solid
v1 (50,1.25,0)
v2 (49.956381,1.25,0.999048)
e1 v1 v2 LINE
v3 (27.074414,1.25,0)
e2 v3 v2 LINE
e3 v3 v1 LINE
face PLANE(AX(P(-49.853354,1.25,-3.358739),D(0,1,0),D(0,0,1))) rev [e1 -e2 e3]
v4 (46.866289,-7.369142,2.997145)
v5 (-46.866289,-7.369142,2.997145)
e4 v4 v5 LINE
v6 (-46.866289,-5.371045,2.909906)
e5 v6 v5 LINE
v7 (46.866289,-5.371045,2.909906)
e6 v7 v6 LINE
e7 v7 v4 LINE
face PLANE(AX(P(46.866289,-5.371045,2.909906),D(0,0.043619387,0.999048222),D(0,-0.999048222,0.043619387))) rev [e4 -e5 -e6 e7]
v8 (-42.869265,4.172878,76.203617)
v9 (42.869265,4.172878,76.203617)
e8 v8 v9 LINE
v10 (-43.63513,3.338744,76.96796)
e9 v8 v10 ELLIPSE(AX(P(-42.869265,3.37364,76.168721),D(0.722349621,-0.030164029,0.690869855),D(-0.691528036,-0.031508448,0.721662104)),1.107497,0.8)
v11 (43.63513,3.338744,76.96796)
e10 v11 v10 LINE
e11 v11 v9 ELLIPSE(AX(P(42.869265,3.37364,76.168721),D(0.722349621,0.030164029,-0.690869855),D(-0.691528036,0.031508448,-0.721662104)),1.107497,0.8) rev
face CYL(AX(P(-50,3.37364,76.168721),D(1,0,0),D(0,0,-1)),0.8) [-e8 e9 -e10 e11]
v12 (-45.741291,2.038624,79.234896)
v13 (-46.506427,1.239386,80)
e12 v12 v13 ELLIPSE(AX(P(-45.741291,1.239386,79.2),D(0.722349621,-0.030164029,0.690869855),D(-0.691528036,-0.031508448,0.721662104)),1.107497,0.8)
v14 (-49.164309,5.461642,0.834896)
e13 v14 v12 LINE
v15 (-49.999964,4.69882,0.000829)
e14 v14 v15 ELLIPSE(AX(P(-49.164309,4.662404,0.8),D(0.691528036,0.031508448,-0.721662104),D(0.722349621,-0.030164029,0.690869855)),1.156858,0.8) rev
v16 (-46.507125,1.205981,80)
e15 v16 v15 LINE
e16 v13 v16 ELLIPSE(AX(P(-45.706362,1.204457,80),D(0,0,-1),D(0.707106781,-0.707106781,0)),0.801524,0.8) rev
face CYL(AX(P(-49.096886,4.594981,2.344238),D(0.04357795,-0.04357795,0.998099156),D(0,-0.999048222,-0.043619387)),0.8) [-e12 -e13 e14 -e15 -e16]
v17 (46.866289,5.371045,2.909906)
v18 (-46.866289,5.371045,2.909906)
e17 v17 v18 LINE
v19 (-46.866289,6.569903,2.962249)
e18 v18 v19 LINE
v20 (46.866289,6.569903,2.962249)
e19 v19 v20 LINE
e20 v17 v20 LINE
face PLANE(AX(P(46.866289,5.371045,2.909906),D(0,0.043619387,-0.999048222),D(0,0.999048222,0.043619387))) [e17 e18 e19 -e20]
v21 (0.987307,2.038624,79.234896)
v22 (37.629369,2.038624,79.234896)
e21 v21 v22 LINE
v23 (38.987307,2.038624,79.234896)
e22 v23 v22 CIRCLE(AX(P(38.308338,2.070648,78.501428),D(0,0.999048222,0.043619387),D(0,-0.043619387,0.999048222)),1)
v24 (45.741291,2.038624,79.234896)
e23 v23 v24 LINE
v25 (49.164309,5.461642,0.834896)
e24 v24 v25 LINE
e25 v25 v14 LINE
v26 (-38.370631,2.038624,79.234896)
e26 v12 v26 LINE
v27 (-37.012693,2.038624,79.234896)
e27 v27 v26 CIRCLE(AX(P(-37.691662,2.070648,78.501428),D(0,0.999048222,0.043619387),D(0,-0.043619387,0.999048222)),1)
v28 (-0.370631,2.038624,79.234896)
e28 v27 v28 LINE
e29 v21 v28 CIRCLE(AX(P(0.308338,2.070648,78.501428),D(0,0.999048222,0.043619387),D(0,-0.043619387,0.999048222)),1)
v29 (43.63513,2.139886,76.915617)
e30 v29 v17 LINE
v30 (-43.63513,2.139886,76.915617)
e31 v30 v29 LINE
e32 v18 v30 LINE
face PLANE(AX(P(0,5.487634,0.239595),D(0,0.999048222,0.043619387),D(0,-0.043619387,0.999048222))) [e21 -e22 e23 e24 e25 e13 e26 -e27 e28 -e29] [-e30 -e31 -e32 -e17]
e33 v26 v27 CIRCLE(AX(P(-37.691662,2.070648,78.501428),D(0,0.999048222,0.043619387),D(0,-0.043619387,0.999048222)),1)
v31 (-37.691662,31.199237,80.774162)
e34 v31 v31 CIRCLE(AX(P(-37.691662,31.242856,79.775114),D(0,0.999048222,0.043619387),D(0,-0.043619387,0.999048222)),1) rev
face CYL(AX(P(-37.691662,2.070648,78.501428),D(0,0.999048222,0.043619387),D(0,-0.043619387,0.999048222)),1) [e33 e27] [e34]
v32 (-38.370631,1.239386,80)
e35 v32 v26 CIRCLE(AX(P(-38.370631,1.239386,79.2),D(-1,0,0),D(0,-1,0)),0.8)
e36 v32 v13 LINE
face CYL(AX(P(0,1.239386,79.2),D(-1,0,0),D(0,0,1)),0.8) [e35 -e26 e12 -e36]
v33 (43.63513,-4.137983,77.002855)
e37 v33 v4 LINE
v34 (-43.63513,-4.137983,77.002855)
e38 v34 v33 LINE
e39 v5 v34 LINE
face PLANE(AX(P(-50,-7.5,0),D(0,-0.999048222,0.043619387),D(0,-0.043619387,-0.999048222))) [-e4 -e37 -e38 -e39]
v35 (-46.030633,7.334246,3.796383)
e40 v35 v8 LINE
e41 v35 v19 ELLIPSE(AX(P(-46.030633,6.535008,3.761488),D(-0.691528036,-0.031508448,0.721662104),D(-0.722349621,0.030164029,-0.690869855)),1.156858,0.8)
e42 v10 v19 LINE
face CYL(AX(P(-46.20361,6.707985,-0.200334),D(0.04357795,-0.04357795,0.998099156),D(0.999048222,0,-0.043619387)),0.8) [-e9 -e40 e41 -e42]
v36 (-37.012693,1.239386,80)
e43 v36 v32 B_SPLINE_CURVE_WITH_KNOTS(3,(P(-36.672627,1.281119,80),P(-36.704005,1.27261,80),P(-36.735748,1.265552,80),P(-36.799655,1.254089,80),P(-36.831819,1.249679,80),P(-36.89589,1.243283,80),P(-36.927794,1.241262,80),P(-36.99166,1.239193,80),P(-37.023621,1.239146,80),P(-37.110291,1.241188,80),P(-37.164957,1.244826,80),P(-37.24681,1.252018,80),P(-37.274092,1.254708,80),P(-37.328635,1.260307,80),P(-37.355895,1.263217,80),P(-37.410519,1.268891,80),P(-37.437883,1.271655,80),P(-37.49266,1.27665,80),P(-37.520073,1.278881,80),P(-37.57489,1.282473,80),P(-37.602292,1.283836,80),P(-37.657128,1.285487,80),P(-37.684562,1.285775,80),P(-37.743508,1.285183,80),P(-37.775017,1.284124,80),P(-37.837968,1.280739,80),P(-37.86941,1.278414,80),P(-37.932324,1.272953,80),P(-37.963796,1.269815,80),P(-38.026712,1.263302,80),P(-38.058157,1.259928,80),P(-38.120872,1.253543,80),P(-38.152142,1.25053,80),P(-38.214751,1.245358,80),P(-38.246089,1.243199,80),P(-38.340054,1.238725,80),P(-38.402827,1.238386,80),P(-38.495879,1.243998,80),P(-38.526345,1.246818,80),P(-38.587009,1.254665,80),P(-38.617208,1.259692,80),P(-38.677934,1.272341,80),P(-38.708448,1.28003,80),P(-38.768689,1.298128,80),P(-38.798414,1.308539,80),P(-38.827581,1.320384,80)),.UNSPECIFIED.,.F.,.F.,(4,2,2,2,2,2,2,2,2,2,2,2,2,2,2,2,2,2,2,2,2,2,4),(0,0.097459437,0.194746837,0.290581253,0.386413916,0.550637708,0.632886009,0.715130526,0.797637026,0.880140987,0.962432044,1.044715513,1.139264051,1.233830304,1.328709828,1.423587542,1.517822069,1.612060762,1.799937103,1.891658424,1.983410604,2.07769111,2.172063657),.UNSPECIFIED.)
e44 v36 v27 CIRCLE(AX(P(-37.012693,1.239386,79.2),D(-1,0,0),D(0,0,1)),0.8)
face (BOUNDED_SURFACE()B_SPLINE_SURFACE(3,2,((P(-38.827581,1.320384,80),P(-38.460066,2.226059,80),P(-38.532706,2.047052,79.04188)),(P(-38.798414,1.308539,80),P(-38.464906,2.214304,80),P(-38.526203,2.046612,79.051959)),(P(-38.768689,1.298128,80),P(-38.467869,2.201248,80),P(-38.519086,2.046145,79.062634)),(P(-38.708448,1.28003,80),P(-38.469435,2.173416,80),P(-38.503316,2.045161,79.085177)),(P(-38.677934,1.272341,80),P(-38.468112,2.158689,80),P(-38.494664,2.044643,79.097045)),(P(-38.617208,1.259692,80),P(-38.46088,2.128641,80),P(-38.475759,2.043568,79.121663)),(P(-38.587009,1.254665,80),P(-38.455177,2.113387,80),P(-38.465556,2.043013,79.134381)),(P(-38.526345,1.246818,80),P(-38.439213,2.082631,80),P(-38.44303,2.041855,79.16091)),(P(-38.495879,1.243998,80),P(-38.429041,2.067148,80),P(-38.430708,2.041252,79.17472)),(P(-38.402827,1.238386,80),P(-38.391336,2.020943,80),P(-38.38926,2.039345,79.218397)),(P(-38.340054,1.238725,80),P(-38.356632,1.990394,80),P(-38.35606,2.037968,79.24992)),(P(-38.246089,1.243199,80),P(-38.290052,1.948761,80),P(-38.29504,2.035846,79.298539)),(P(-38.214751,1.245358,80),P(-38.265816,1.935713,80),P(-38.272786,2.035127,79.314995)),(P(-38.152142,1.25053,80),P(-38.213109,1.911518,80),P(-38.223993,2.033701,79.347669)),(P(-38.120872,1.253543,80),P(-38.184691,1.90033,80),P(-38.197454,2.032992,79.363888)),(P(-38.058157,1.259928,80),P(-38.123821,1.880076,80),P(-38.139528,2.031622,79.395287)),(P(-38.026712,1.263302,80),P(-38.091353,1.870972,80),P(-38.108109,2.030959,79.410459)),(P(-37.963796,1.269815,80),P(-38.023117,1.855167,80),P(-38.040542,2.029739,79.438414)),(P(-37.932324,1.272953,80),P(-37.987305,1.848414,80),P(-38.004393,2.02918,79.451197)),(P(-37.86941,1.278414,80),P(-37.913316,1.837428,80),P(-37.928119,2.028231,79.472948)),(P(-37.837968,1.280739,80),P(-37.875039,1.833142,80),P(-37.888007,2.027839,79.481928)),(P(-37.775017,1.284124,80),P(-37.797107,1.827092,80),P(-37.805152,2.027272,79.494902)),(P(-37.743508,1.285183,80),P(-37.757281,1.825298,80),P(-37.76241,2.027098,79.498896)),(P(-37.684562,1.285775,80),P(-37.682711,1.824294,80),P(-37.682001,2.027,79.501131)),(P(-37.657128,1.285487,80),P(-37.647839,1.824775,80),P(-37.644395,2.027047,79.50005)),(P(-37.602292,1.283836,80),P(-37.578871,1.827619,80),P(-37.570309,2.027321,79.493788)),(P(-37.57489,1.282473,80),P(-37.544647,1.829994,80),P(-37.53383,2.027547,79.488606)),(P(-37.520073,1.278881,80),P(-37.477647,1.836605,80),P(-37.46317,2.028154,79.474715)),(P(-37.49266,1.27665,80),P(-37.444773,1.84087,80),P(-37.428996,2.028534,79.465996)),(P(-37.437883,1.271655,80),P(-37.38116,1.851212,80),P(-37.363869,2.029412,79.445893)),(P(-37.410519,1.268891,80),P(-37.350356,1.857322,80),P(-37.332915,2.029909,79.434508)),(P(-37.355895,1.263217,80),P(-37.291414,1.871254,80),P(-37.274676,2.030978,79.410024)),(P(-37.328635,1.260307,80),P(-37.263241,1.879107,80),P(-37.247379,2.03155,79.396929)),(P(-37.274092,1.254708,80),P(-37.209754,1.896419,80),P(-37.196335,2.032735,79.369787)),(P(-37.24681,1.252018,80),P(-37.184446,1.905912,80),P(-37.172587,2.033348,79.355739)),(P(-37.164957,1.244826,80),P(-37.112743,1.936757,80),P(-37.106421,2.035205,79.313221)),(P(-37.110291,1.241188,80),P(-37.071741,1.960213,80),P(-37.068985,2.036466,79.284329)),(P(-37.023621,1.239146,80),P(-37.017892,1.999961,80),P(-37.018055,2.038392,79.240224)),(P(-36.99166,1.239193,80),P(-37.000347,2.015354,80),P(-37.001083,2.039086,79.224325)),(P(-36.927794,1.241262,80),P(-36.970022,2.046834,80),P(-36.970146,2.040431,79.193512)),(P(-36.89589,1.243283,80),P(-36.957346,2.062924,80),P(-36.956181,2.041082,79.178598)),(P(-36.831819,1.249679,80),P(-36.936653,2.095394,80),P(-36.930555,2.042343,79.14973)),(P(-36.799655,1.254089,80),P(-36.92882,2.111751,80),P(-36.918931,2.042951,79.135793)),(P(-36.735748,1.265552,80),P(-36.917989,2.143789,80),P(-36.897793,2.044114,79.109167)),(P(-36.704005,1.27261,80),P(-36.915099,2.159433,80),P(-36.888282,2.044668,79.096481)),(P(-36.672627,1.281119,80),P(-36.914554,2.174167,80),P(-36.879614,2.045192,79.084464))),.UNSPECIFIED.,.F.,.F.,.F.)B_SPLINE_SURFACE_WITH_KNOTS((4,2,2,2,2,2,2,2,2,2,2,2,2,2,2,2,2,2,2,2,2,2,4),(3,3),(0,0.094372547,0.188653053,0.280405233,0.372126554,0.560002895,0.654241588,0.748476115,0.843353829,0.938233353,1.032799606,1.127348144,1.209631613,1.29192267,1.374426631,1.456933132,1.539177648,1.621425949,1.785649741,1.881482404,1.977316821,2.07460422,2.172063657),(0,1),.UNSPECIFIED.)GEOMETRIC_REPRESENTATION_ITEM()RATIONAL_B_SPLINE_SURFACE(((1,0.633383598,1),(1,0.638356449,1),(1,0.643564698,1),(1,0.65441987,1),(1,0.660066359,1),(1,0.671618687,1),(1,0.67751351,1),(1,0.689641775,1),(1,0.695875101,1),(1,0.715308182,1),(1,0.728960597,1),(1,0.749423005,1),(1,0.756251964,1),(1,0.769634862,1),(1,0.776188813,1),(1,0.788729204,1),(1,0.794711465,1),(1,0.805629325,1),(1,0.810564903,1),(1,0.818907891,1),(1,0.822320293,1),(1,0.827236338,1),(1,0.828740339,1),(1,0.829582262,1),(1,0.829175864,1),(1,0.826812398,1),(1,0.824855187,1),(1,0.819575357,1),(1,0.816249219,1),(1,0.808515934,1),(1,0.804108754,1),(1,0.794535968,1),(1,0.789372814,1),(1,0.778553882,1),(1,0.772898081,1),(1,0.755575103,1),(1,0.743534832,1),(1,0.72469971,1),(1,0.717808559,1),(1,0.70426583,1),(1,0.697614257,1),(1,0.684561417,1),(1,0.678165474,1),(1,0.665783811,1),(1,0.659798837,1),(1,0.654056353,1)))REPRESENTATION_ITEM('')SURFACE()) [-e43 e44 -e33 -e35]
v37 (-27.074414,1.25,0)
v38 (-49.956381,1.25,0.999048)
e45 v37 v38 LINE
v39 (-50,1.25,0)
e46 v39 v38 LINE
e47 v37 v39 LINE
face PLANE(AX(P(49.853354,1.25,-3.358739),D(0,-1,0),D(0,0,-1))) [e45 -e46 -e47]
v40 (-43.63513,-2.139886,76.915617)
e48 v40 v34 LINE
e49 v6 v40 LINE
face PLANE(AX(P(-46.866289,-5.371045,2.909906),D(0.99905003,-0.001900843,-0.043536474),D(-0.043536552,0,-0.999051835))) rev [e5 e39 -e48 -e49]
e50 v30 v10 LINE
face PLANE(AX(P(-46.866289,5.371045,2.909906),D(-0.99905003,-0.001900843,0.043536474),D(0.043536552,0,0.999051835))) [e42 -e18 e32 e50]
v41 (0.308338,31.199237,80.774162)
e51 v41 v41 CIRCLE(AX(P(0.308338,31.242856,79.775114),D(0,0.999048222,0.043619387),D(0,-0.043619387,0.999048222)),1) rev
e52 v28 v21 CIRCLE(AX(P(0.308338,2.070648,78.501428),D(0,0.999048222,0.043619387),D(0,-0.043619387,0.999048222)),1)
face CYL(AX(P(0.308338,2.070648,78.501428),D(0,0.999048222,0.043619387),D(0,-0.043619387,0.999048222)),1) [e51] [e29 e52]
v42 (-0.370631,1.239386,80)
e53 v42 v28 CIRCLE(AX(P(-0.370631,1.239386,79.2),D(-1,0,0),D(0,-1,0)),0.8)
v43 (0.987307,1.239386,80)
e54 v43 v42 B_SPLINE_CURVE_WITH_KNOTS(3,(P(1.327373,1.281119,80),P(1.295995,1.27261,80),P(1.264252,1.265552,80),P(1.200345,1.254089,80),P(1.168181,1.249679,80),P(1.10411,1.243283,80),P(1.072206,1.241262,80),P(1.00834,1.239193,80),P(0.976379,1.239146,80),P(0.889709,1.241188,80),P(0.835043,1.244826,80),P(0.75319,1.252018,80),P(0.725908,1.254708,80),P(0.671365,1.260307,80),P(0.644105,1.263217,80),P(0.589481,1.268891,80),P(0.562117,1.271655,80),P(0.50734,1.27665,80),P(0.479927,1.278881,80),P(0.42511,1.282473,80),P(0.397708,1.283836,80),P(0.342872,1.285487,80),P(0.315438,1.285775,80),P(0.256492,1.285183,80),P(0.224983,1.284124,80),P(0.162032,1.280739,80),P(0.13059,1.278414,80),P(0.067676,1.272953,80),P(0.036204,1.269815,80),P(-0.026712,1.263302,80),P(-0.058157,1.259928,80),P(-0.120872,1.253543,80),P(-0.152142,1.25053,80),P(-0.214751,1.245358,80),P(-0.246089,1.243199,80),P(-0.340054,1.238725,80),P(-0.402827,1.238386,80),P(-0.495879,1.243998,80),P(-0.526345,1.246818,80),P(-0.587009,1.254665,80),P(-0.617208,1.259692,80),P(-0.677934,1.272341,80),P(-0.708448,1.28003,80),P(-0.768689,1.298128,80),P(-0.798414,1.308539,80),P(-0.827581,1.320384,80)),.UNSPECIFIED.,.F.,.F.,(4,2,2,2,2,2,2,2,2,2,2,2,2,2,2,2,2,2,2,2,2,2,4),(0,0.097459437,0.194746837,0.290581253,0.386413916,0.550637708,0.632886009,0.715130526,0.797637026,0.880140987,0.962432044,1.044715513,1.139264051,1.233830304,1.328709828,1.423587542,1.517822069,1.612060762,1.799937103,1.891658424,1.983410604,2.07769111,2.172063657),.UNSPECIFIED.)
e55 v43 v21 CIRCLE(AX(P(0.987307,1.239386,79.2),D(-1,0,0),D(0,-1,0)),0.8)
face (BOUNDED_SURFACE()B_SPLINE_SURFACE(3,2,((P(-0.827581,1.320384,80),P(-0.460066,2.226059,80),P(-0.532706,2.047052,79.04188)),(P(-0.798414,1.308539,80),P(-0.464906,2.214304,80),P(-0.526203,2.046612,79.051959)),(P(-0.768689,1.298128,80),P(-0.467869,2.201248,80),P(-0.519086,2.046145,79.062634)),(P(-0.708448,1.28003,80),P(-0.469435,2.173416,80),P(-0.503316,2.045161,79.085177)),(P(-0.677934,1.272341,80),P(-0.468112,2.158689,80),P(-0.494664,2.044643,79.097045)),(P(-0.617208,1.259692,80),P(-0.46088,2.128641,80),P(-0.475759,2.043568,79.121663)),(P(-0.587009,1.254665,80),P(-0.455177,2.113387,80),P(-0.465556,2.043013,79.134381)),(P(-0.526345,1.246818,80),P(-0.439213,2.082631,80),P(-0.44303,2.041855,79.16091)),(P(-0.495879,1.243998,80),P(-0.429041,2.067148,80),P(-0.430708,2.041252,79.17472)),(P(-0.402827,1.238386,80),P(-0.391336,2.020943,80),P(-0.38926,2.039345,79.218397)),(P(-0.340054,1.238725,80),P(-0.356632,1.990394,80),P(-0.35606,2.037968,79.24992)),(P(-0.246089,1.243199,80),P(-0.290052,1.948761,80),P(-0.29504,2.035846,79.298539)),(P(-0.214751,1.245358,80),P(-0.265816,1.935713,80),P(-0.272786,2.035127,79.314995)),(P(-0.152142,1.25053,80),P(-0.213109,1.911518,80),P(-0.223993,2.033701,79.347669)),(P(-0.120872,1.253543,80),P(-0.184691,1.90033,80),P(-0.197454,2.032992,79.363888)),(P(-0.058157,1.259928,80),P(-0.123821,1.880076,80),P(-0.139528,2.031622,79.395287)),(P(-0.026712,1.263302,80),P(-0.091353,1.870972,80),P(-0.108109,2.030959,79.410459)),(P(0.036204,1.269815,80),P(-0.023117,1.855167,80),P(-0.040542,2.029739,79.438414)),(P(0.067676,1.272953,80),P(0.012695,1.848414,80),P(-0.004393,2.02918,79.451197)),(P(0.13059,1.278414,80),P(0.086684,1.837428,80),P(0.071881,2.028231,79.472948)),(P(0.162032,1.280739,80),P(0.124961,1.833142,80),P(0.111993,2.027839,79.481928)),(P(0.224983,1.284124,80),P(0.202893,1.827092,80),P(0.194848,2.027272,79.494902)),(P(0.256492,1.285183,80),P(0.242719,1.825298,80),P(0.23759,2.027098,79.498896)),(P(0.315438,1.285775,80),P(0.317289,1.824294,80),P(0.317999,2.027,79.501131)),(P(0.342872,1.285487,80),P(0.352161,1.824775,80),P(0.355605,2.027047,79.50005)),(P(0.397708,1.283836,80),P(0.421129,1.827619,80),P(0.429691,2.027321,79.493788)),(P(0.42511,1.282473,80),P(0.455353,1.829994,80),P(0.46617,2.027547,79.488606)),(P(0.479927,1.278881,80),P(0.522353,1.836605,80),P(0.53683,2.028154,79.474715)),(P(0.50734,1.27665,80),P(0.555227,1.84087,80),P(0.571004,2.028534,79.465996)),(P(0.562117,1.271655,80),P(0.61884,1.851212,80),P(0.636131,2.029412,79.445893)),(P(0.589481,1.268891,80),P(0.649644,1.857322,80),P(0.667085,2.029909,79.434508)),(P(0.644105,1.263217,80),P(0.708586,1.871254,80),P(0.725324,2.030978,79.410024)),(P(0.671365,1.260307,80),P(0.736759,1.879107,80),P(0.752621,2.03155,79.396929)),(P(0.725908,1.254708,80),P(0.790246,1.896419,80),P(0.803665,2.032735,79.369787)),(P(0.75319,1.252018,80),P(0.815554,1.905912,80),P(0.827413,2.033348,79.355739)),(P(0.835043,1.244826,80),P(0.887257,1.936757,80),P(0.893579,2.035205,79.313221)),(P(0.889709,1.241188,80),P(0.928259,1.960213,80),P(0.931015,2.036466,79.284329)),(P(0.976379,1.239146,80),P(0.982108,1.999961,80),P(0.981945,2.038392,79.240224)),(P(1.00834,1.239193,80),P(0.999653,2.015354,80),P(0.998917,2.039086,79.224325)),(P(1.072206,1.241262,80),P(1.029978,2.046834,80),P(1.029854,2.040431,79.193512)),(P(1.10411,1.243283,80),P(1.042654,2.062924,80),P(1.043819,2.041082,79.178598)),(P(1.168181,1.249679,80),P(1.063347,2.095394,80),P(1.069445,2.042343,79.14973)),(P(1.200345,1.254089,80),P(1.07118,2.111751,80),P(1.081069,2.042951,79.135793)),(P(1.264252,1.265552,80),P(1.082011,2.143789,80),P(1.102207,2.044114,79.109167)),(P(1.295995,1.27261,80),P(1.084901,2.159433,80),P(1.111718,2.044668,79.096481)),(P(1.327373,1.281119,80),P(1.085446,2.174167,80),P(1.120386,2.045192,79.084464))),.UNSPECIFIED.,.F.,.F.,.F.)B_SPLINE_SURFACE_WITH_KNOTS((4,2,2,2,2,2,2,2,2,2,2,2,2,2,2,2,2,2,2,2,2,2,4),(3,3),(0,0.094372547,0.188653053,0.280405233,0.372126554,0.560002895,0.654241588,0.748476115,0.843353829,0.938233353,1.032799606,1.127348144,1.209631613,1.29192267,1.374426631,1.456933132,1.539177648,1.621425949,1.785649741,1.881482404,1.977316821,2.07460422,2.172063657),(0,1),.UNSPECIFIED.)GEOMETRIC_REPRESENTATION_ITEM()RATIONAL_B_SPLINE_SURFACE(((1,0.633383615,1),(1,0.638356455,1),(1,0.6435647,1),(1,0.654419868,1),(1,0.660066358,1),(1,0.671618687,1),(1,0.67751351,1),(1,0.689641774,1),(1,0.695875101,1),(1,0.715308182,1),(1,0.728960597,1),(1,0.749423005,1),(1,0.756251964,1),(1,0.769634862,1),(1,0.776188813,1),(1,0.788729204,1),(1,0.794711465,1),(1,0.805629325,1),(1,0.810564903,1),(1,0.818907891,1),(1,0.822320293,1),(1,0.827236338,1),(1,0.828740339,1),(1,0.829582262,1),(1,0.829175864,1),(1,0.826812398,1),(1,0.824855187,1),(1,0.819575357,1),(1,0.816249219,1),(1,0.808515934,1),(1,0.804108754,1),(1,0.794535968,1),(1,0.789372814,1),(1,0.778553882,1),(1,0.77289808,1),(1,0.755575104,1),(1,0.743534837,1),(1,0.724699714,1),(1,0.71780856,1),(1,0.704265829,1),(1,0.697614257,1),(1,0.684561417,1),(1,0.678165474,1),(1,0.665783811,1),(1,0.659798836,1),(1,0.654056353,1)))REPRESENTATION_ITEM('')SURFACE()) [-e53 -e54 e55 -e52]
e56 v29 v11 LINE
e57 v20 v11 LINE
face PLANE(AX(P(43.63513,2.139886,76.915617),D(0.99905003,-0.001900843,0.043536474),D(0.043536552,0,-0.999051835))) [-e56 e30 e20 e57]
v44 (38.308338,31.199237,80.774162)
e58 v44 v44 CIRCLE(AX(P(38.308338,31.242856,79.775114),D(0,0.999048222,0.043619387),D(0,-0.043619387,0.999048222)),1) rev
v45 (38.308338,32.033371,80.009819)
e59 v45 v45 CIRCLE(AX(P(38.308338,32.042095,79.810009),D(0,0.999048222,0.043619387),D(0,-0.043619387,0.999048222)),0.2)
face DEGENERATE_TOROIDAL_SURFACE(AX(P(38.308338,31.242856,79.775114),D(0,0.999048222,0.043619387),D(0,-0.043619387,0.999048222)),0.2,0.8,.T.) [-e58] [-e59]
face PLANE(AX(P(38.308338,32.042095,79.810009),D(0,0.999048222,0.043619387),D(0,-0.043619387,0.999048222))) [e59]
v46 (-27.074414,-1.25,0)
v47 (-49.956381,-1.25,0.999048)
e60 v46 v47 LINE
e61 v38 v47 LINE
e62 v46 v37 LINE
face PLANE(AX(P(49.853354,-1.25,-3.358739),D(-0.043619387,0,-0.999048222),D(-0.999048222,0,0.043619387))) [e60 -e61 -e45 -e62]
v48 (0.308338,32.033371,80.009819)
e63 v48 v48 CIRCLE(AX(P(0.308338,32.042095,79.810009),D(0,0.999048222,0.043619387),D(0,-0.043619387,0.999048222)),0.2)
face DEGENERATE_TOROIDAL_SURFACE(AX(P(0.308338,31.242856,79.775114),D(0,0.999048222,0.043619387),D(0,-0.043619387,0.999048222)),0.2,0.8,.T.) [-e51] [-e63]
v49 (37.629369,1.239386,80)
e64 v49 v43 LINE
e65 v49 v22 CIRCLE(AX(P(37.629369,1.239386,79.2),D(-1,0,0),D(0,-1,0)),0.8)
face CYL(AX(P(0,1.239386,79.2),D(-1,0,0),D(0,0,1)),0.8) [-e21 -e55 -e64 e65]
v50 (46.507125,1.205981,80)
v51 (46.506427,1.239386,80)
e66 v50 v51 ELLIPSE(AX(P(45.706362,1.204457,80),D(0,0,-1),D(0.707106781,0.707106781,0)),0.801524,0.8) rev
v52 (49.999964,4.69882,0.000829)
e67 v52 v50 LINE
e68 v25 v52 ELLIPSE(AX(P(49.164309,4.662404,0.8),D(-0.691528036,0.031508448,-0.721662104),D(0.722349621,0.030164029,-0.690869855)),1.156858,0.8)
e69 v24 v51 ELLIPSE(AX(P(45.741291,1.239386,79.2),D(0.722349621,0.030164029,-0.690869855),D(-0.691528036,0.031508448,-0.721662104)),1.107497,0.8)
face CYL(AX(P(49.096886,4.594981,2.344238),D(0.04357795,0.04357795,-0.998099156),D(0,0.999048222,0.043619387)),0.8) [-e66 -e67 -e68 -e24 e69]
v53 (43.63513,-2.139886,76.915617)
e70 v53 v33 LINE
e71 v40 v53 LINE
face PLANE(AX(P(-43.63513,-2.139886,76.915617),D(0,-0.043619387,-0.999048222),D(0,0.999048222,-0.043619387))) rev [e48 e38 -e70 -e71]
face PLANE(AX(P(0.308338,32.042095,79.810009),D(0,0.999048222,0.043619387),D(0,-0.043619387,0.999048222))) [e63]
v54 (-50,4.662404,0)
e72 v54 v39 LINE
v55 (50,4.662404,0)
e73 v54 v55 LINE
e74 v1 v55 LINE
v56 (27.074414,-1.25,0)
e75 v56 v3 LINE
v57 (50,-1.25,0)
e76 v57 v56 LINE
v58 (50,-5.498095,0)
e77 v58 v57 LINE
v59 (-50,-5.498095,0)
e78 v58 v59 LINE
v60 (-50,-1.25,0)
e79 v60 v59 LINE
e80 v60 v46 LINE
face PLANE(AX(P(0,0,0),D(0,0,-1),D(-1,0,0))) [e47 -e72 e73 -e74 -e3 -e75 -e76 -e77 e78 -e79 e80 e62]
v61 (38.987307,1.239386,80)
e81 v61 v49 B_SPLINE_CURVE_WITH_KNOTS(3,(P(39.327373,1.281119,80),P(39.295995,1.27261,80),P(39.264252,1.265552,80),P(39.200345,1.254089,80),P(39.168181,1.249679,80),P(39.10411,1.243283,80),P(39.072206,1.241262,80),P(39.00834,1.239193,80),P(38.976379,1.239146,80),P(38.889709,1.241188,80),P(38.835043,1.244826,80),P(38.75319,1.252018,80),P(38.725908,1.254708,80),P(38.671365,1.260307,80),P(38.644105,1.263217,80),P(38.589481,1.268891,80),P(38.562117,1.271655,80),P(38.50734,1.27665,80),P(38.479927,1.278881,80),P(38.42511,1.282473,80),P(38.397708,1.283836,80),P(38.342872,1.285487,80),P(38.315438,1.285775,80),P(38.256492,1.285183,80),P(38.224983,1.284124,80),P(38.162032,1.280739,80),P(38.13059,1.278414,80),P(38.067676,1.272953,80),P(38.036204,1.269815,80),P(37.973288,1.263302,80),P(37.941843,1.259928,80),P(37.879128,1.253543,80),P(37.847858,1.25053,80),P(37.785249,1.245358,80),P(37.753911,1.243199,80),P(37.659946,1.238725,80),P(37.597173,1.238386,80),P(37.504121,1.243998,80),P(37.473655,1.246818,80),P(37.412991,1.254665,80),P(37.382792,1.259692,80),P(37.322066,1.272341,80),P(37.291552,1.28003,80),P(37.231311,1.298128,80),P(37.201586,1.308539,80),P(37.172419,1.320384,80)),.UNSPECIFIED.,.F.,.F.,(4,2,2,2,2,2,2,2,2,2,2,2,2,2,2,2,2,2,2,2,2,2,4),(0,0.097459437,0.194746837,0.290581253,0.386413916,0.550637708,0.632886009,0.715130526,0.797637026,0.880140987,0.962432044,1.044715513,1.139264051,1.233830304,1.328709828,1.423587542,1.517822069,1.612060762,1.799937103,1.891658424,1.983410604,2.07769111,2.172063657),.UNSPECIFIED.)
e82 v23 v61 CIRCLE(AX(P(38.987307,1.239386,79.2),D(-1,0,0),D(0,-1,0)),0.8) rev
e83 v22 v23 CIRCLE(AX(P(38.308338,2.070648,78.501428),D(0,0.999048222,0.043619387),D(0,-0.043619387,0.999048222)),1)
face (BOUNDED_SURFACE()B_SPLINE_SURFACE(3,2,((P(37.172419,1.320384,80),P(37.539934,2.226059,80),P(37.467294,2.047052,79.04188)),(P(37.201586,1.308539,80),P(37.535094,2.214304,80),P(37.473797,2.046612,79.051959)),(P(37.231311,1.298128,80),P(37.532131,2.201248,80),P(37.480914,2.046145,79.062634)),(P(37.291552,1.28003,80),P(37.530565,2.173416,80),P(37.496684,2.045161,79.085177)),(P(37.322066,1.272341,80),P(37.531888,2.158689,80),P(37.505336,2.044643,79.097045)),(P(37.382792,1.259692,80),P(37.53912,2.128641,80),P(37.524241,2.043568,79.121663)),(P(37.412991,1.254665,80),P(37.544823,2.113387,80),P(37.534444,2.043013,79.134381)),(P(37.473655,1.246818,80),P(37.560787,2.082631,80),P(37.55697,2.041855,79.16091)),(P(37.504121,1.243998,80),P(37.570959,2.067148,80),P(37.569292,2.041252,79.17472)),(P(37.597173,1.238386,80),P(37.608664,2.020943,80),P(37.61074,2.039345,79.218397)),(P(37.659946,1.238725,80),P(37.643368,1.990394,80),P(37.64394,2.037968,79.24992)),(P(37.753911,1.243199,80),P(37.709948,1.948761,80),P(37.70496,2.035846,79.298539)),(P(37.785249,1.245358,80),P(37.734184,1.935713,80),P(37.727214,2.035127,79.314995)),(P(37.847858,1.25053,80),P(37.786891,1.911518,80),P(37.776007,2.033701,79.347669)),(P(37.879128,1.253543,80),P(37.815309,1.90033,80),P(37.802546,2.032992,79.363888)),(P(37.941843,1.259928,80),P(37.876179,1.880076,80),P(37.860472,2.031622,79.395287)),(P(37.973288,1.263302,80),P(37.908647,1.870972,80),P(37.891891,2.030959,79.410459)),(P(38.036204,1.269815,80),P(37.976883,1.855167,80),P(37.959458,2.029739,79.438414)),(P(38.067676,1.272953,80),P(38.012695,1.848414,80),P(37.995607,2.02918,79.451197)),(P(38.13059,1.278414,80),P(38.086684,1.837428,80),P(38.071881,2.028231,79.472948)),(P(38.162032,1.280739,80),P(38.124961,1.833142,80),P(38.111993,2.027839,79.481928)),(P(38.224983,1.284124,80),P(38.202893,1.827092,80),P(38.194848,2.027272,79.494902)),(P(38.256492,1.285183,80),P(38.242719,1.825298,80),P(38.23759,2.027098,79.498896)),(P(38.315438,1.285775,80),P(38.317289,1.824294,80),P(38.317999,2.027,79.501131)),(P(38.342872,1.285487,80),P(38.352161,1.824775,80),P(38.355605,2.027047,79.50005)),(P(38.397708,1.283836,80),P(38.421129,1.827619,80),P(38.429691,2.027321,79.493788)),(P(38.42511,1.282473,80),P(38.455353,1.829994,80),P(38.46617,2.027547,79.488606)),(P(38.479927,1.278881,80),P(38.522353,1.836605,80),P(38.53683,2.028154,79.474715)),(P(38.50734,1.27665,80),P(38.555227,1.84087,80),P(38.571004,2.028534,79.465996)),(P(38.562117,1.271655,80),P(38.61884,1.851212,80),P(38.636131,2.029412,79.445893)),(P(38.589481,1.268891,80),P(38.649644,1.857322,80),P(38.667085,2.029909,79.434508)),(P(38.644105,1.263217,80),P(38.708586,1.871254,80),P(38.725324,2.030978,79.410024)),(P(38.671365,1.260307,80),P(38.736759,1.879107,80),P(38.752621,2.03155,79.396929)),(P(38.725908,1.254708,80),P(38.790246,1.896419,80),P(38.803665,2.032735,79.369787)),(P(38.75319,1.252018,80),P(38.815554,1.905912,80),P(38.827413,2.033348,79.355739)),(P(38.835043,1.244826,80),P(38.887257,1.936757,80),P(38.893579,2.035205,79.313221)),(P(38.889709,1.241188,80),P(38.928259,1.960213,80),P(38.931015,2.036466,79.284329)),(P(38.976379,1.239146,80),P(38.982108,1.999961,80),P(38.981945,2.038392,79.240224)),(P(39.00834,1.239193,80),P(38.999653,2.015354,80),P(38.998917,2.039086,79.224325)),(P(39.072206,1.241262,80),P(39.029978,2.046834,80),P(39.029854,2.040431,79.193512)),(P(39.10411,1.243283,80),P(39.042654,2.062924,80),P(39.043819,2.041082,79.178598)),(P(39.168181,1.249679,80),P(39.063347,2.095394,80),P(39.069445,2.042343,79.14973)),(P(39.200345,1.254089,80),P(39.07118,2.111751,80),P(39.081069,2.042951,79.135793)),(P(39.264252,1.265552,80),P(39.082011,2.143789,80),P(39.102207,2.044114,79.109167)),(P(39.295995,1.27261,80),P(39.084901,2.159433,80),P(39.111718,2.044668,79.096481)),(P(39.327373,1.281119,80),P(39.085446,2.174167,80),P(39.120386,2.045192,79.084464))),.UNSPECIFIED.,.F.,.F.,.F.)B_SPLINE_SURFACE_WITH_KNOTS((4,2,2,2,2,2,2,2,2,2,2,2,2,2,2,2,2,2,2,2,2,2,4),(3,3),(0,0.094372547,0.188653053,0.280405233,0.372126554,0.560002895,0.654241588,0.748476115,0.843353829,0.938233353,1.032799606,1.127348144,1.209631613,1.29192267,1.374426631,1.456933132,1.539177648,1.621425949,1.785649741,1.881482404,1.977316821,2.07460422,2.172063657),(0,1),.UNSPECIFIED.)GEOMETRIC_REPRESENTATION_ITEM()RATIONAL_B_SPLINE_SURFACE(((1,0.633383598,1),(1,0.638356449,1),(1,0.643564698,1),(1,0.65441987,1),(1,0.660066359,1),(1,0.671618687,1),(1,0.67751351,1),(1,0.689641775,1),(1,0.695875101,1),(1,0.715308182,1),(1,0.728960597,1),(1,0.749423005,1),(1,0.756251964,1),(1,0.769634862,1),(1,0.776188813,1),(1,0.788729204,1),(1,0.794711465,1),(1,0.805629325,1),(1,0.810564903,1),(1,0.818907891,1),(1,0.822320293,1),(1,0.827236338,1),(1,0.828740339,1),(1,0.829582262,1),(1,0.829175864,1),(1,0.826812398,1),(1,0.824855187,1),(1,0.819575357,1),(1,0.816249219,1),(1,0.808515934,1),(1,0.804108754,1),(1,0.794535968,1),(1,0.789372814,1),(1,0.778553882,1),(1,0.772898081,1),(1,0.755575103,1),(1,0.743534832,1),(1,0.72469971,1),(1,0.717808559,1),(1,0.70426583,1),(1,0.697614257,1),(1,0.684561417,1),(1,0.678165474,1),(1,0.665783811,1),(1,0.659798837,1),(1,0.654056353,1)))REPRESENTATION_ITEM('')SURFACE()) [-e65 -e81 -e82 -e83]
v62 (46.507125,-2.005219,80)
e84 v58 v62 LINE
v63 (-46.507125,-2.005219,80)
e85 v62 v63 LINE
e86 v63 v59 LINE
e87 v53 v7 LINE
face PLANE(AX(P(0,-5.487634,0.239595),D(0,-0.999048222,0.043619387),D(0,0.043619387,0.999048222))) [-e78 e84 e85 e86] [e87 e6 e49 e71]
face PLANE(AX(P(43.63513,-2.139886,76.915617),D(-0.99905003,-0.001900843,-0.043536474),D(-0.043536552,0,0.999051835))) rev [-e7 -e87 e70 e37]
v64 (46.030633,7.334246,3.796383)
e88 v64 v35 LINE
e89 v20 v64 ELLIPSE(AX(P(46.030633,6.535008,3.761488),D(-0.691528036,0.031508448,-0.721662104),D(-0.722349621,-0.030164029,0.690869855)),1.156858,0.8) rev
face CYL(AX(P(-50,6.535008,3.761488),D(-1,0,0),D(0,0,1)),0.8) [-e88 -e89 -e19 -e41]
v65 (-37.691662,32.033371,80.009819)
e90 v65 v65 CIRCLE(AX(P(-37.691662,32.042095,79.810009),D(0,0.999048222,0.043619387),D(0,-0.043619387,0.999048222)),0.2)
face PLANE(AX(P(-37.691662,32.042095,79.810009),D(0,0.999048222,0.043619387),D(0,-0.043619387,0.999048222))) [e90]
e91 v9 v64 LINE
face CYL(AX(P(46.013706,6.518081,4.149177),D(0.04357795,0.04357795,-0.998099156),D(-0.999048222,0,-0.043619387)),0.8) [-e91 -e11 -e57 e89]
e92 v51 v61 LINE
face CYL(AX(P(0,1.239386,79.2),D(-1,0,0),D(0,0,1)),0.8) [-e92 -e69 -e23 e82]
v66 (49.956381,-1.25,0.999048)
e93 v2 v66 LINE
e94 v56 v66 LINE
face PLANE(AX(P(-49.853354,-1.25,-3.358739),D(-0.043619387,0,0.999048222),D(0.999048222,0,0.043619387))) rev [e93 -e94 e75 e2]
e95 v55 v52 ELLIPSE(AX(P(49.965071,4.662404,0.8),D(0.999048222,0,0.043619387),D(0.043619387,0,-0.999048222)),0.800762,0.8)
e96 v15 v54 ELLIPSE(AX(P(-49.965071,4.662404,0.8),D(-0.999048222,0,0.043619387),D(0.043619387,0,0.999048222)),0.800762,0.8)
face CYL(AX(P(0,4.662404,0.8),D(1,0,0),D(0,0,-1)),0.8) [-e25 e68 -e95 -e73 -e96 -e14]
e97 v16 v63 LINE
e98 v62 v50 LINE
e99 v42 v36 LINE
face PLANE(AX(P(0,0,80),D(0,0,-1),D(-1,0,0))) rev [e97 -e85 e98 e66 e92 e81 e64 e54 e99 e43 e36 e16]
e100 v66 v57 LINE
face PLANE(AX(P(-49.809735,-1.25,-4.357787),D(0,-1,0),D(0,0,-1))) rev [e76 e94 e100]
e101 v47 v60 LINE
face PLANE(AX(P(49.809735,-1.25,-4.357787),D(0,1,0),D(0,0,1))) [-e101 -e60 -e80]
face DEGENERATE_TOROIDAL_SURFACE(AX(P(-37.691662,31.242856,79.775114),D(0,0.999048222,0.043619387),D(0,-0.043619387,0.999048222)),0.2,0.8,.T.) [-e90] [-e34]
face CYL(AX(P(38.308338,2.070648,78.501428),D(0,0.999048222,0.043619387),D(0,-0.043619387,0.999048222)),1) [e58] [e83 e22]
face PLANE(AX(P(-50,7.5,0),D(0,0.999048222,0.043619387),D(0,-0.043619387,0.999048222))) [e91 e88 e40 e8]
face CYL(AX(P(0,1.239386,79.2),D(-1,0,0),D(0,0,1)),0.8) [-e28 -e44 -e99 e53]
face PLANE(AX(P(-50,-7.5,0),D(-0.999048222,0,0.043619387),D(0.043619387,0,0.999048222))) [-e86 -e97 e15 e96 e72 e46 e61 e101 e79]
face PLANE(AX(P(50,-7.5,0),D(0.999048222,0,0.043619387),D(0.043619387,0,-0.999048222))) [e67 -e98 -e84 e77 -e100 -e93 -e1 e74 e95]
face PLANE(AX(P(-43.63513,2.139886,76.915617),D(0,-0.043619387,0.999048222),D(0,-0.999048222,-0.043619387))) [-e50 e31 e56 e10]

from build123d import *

# Parameters (mm, degrees)
ESQUISSE1_W                = 100
ESQUISSE1_H                = 15
BOSS_EXTRU_1_DEPTH         = 80
BOSS_EXTRU_1_TAPER         = 2.5
ESQUISSE2_W                = 1
ESQUISSE2_H                = 2.5
ENL_V_MAT_EXTRU_1_DEPTH    = 127.859596195
ENL_V_MAT_EXTRU_2_DEPTH    = 2
ESQUISSE5_R                = 1
R_P_TITION_LIN_AIRE1_COUNT = 3
R_P_TITION_LIN_AIRE1_PITCH = 38
CONG_1_R                   = 0.8
CONG_2_R                   = 0.8


with BuildPart() as part:
    # Esquisse1 → Boss.-Extru.1 (new body)
    with BuildSketch(Plane.XY):
        Rectangle(ESQUISSE1_W, ESQUISSE1_H)
    extrude(amount=BOSS_EXTRU_1_DEPTH, taper=BOSS_EXTRU_1_TAPER)

    # Esquisse2 → Enlèv. mat.-Extru.1 (cut, through all)
    with BuildSketch(Plane(origin=(49.904867452, 0, 2.178893569), x_dir=(0.043619387365336104, 0, -0.9990482215818578), z_dir=(0.9990482215818577, 0, 0.0436193873653361))):
        with Locations((1.680969368, 0)):
            Rectangle(ESQUISSE2_W, ESQUISSE2_H)
    enl_v_mat_extru_1 = extrude(amount=-ENL_V_MAT_EXTRU_1_DEPTH, mode=Mode.SUBTRACT)

    # Symétrie1: Enlèv. mat.-Extru.1 across plane
    add(enl_v_mat_extru_1.mirror(Plane(origin=(0, 0, 0), x_dir=(0, 0, 1), z_dir=(1, 0, 0))), mode=Mode.SUBTRACT)

    # Esquisse3 → Enlèv. mat.-Extru.2 (cut)
    with BuildSketch(Plane(origin=(0, 7.485730118, 0.326834035), x_dir=(1, 0, 0), z_dir=(0, 0.9990482215818577, 0.0436193873653361))):
        Polygon((53.133710782, 3.327145405), (-53.133710782, 3.327145405), (-49.379119025, -82.749069408), (49.379119025, -82.749069408), align=None)
        Polygon((46.866289218, -2.672854595), (-46.866289218, -2.672854595), (-43.635130109, -76.749069408), (43.635130109, -76.749069408), align=None, mode=Mode.SUBTRACT)
    enl_v_mat_extru_2 = extrude(amount=-ENL_V_MAT_EXTRU_2_DEPTH, mode=Mode.SUBTRACT)

    # Symétrie2: Enlèv. mat.-Extru.2 across plane
    add(enl_v_mat_extru_2.mirror(Plane.ZX), mode=Mode.SUBTRACT)

    # Balayage1: sweep along a path in Esquisse4
    with BuildLine(Plane(origin=(0, -3.347747388, 76.6760213), x_dir=(1, 0, 0), z_dir=(0, -0.043619387365336104, 0.9990482215818578))) as balayage1_path:
        Line((-37.620500895, 5.492861662), (-37.620500895, 35.492861662))
    # Esquisse5 → Balayage1 (sweep)
    with BuildSketch(Plane(origin=(0, 5.487633675, 0.239595261), x_dir=(1, 0, 0), z_dir=(0, 0.9990482215818578, 0.04361938736533611))):
        with Locations((-37.691661974, -78.336391294)):
            Circle(ESQUISSE5_R)
    balayage1 = sweep(path=balayage1_path.line)

    # Répétition linéaire1: Balayage1 ×3
    with Locations(*[(i * R_P_TITION_LIN_AIRE1_PITCH, 0, 0) for i in range(1, R_P_TITION_LIN_AIRE1_COUNT)]):
        add(balayage1)

    # Congé1
    cong_1_edges = [part.edges().sort_by_distance(p)[0] for p in [
        (-38.691661974, 32.042094925, 79.810009289),
        (-0.691661974, 32.042094925, 79.810009289),
        (37.308338026, 32.042094925, 79.810009289),
    ]]
    fillet(cong_1_edges, radius=CONG_1_R)

    # Congé2
    cong_2_edges = [part.edges().sort_by_distance(p)[0] for p in [
        (0, 2.005219197, 80),
        (0, 5.49809463, 0),
        (-48.253562284, 3.751656913, 40),
        (48.253562284, 3.751656913, 40),
        (45.250709663, 5.753562284, 40),
        (0, 4.137982729, 77.002855335),
        (-45.250709663, 5.753562284, 40),
        (0, 7.369141838, 2.997144665),
    ]]
    fillet(cong_2_edges, radius=CONG_2_R)


solid = part.part
